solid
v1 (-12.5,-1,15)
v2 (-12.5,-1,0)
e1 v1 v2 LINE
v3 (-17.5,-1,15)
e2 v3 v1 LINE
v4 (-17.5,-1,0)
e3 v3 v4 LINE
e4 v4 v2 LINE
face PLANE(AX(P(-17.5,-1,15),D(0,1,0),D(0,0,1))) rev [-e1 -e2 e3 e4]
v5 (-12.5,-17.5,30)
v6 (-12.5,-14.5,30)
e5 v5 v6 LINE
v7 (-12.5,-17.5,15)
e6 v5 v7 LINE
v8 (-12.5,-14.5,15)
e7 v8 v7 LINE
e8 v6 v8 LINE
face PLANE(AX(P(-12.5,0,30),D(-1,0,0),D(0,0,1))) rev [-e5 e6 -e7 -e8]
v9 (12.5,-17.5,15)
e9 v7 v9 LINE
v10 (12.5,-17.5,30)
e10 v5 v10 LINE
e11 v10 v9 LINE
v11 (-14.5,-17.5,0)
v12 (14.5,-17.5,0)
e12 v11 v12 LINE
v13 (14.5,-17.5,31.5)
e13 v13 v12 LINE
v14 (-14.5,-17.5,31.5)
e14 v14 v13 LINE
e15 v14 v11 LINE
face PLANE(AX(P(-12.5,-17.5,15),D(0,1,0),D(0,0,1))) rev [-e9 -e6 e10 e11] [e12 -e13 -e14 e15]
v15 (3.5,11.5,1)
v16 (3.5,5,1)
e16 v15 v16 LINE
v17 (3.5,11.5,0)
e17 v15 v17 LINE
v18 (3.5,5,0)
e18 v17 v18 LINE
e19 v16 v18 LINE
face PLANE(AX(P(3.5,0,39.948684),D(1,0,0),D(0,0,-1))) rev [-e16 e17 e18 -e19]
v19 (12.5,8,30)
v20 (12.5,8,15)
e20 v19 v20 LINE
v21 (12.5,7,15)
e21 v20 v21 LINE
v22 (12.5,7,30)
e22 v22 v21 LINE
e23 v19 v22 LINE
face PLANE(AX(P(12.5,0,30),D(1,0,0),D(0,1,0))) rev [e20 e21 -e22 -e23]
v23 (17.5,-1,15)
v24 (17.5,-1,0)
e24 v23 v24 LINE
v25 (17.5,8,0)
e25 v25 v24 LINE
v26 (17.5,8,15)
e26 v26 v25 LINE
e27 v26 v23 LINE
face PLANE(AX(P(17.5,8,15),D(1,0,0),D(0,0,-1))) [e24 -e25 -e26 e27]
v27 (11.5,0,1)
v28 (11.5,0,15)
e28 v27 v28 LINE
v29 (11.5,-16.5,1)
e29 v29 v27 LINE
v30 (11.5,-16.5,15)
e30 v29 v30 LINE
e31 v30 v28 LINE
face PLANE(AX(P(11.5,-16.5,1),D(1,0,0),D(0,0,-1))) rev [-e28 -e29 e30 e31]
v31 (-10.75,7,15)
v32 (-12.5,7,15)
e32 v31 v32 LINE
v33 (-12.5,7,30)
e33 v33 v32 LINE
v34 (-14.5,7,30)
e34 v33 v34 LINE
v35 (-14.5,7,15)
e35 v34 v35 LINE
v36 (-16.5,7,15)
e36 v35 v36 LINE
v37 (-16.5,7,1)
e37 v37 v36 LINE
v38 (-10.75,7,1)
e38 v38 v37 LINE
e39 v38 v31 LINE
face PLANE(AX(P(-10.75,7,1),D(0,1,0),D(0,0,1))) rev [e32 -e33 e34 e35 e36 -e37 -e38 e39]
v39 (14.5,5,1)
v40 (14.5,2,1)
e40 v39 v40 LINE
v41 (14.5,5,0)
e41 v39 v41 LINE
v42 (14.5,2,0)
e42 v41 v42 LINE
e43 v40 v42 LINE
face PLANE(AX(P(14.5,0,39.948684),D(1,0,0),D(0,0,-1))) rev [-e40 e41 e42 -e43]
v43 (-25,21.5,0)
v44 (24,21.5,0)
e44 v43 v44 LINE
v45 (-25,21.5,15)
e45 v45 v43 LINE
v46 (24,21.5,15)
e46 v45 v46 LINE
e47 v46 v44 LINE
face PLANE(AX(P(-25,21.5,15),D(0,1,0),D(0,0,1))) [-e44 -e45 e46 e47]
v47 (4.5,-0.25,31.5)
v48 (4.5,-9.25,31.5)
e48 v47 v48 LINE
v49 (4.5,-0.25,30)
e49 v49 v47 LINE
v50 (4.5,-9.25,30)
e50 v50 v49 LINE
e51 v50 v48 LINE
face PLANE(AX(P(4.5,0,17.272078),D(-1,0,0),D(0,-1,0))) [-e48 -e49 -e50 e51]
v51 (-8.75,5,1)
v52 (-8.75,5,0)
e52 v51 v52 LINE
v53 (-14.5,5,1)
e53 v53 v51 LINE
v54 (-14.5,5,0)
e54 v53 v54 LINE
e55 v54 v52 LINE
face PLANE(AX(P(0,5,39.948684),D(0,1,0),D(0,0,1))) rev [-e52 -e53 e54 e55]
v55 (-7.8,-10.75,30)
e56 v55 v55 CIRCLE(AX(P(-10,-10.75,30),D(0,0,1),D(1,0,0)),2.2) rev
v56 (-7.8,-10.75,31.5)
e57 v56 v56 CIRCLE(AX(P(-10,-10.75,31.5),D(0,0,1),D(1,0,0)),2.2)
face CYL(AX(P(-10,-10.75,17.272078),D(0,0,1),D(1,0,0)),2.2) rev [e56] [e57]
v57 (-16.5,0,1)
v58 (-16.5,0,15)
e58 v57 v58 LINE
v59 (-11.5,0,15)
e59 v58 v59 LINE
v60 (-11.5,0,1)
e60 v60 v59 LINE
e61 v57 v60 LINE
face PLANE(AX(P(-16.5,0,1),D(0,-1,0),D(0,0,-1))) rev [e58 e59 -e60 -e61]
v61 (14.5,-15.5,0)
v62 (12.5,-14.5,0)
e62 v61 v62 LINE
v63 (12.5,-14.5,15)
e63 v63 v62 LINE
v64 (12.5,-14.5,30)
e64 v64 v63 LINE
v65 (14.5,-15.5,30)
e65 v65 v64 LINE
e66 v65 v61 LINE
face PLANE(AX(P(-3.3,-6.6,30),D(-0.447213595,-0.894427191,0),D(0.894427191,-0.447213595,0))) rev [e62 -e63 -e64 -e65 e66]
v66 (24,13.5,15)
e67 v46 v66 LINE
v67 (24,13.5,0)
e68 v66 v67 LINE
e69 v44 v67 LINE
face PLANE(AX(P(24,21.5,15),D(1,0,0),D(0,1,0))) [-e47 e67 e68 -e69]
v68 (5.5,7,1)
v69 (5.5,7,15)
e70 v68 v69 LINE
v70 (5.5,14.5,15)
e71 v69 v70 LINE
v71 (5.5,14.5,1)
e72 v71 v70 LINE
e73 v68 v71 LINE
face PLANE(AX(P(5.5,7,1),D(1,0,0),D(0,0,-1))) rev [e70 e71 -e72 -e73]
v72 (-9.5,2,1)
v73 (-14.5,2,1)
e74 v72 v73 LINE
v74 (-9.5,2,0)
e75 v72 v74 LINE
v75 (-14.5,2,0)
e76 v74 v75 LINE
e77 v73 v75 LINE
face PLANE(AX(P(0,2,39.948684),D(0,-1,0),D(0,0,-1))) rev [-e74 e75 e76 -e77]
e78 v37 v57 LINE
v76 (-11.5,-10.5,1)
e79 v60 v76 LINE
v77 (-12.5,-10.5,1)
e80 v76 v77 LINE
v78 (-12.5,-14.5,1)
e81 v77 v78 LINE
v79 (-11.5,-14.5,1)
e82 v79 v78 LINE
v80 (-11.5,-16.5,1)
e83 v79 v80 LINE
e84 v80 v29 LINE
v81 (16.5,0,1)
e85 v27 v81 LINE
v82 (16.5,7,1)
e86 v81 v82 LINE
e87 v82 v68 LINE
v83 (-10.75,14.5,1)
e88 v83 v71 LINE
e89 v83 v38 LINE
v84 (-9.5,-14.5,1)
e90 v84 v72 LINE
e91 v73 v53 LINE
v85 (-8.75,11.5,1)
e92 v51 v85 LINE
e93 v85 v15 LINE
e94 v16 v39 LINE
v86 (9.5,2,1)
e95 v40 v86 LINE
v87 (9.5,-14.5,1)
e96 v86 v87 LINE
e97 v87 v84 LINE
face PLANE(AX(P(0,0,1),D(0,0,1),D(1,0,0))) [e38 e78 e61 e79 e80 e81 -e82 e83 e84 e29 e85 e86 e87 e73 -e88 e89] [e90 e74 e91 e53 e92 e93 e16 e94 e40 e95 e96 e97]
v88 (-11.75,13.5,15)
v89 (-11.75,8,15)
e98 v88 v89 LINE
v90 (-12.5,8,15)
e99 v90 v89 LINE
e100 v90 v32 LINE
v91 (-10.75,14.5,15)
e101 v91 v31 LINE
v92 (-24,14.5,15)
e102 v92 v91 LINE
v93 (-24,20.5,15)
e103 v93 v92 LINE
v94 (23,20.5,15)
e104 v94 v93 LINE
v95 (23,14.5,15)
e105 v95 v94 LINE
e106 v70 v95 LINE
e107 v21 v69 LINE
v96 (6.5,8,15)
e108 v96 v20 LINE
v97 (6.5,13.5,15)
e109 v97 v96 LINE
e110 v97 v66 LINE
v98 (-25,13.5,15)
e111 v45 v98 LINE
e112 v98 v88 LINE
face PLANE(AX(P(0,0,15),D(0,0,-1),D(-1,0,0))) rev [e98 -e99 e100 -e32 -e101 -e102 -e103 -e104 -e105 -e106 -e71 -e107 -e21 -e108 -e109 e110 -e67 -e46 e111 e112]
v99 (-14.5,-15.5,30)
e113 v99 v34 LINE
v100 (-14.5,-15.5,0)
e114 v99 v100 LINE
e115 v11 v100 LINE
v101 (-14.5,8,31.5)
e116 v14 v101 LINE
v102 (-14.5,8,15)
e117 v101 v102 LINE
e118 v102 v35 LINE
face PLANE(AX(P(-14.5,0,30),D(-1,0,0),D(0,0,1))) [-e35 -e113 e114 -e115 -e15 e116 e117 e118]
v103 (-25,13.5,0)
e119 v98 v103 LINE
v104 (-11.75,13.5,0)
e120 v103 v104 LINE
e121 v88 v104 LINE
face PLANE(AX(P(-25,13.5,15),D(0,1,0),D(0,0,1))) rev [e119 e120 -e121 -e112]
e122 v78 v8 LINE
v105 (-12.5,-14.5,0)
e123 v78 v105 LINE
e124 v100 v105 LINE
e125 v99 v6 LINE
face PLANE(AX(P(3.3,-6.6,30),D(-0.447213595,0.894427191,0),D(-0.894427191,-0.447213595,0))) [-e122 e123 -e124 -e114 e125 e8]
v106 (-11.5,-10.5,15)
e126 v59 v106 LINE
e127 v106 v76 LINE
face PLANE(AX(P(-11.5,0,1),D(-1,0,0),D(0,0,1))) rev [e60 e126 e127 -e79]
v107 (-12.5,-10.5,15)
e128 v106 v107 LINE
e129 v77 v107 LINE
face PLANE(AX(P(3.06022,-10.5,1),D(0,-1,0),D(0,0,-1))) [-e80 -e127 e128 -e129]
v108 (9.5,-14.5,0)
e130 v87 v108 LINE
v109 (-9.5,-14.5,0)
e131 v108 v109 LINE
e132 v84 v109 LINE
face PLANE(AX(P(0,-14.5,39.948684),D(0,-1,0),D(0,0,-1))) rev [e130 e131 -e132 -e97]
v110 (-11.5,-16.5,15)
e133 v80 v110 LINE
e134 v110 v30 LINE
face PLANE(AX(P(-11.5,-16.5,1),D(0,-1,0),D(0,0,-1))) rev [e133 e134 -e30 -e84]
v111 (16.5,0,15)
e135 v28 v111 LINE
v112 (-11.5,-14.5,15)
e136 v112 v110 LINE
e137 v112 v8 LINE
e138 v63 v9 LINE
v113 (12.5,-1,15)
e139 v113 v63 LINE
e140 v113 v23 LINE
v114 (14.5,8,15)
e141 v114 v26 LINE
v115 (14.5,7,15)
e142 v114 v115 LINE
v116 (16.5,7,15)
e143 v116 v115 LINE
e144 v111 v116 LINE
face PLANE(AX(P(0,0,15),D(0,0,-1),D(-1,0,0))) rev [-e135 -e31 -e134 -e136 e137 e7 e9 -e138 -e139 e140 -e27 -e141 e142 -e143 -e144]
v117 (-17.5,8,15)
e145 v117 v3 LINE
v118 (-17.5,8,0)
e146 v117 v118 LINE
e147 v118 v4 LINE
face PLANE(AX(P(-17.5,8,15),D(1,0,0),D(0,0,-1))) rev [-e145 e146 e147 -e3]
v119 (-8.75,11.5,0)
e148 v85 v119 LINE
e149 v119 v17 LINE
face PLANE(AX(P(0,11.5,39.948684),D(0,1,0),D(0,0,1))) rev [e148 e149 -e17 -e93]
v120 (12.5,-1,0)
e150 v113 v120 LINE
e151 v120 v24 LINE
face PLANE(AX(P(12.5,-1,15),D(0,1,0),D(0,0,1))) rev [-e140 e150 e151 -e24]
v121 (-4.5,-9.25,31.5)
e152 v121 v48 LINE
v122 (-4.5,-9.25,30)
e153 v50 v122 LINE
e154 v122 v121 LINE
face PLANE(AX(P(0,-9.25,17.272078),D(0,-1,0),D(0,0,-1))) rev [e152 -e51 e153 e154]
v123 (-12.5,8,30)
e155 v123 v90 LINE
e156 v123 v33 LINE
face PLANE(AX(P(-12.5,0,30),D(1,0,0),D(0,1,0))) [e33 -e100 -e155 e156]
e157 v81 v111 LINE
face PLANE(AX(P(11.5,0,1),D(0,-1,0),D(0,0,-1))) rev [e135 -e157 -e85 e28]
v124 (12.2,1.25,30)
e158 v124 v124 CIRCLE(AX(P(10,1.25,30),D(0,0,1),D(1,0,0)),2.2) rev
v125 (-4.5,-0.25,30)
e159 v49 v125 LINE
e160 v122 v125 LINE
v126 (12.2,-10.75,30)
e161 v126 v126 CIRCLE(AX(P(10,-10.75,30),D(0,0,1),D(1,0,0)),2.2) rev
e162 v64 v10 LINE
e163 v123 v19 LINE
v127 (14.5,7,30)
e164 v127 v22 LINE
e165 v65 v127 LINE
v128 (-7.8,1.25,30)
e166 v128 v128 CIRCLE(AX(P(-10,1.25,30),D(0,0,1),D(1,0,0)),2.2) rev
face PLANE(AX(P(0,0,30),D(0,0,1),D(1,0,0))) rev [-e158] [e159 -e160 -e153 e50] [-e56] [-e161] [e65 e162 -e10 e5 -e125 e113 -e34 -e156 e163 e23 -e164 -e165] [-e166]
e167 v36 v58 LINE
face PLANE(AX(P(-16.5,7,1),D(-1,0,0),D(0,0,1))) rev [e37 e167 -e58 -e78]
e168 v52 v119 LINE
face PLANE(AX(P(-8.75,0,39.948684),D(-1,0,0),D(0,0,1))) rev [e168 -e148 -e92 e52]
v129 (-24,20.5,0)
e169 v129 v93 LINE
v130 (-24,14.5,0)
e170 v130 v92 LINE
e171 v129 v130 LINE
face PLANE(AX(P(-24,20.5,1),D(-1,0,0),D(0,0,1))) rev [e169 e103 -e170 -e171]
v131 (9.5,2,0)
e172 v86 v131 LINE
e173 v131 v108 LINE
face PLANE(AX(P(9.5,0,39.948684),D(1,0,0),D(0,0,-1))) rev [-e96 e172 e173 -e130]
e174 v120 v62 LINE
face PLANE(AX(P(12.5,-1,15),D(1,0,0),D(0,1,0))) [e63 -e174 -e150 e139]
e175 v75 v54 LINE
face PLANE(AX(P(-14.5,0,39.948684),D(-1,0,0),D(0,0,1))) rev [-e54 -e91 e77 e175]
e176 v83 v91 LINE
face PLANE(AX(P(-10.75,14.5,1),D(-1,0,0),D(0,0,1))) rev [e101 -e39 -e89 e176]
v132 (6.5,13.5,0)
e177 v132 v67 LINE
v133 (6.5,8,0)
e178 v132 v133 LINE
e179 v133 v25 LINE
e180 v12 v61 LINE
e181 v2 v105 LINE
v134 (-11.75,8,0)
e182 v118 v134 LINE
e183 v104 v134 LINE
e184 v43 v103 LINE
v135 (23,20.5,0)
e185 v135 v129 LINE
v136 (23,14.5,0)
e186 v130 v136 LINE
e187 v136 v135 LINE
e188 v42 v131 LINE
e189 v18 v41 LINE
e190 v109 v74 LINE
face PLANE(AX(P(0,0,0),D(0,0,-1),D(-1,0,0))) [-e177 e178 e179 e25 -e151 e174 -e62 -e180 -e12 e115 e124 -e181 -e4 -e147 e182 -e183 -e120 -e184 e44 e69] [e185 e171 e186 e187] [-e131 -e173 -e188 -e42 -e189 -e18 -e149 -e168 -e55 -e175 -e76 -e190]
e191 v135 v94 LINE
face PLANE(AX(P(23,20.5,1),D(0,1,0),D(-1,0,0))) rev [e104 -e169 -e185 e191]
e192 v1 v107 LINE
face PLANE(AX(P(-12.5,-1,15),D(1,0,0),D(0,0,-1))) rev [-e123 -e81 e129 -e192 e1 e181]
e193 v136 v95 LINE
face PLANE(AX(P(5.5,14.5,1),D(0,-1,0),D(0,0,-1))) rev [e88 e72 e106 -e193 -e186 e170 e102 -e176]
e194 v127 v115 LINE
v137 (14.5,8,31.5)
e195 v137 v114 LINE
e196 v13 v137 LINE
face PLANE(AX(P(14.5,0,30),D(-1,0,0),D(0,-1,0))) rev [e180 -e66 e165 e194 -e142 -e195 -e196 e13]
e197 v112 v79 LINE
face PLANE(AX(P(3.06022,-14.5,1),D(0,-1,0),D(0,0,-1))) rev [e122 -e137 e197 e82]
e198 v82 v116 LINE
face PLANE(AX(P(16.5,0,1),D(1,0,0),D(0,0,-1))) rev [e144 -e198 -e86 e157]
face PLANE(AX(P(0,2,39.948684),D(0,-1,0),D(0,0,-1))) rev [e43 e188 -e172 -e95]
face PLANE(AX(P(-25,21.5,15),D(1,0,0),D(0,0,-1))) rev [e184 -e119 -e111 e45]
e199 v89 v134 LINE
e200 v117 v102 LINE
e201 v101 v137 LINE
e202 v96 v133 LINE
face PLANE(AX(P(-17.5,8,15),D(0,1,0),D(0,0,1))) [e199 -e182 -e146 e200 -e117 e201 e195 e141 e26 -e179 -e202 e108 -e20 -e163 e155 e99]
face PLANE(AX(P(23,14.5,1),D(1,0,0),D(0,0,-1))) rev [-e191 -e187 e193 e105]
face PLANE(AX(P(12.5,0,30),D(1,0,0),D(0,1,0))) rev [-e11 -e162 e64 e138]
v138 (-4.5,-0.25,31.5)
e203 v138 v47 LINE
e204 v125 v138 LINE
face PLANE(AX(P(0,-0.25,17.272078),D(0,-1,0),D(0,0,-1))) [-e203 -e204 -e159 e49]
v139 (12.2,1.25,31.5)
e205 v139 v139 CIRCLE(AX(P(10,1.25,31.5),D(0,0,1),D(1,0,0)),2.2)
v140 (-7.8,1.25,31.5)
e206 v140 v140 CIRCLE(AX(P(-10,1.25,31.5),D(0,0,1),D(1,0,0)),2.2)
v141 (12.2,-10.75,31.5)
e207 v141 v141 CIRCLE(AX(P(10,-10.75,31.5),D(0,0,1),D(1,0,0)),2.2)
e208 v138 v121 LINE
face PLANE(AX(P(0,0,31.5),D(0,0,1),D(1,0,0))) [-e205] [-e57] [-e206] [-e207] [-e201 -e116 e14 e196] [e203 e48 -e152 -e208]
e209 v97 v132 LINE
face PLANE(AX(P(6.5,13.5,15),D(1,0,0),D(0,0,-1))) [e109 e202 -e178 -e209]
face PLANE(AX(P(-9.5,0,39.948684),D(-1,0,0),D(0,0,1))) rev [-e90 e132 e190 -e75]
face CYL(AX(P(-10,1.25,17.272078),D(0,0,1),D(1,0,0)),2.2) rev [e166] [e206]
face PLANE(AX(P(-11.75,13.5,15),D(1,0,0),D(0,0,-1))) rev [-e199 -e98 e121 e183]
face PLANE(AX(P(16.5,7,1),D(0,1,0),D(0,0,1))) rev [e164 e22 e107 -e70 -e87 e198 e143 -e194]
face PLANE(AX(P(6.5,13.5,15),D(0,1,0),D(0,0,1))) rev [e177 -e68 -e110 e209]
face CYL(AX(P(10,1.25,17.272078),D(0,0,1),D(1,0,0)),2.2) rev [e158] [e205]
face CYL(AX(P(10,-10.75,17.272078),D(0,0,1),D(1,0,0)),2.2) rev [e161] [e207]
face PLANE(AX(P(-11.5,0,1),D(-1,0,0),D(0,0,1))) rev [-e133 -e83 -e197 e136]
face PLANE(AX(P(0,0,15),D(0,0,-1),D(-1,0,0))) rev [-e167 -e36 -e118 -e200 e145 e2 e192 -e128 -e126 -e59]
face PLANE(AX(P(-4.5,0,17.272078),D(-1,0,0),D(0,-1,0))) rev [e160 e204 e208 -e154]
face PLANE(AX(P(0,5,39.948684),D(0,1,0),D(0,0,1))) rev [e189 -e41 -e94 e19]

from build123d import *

# Parameters (mm, degrees)
EXTRUDE_1_DEPTH      = 15
CUT_EXTRUDE_1_DEPTH  = 14
SKETCH_7_W           = 47
SKETCH_7_H           = 6
CUT_EXTRUDE_2_DEPTH  = 1
SKETCH_8_W           = 14
SKETCH_8_H           = 4
CUT_EXTRUDE_3_DEPTH  = 1
CUT_EXTRUDE_6_DEPTH  = 1
EXTRUDE_START        = -30
EXTRUDE_10_OUTLINE_W = 2
EXTRUDE_10_OUTLINE_H = 1
EXTRUDE_10_DEPTH     = 30
SKETCH_29_W          = 29
SKETCH_29_H          = 25.5
EXTRUDE_12_DEPTH     = 1.5
SKETCH_30_R          = 2.2
SKETCH_30_W          = 9
SKETCH_30_H          = 9
CUT_EXTRUDE_8_DEPTH  = 1.5


# Read off the part's stored shape, not the designer's step: 凸台-拉伸10
with BuildPart() as part:
    # 草图3 → 凸台-拉伸1 (new body)
    with BuildSketch(Plane.XY):
        Polygon((-25, 21.5), (24, 21.5), (24, 13.5), (6.5, 13.5), (6.5, 8), (17.5, 8), (17.5, -1), (12.5, -1), (12.5, -17.5), (-12.5, -17.5), (-12.5, -1), (-17.5, -1), (-17.5, 8), (-11.75, 8), (-11.75, 13.5), (-25, 13.5), align=None)
    extrude(amount=EXTRUDE_1_DEPTH)

    # 草图4 → 切除-拉伸1 (cut)
    with BuildSketch(Plane.XY.offset(15)):
        Polygon((23, 20.5), (-24, 20.5), (-24, 14.5), (-10.75, 14.5), (-10.75, 7), (-16.5, 7), (-16.5, 0), (-11.5, 0), (-11.5, -16.5), (11.5, -16.5), (11.5, 0), (16.5, 0), (16.5, 7), (5.5, 7), (5.5, 14.5), (23, 14.5), align=None)
    extrude(amount=-CUT_EXTRUDE_1_DEPTH, mode=Mode.SUBTRACT)

    # 草图7 → 切除-拉伸2 (cut)
    with BuildSketch(Plane.XY.offset(1)):
        with Locations((-0.5, 17.5)):
            Rectangle(SKETCH_7_W, SKETCH_7_H)
    extrude(amount=-CUT_EXTRUDE_2_DEPTH, mode=Mode.SUBTRACT)

    # 草图8 → 切除-拉伸3 (cut)
    with BuildSketch(Plane.ZY.offset(12.5)):
        with Locations((8, -12.5)):
            Rectangle(SKETCH_8_W, SKETCH_8_H)
    extrude(amount=-CUT_EXTRUDE_3_DEPTH, mode=Mode.SUBTRACT)

    # 草图9 → 切除-拉伸6 (cut)
    with BuildSketch(Plane(origin=(0, 0, 0), x_dir=(-1, 0, 0), z_dir=(0, 0, -1))):
        Polygon((-3.5, 11.5), (-3.5, 5), (-14.5, 5), (-14.5, 2), (-9.5, 2), (-9.5, -14.5), (9.5, -14.5), (9.5, 2), (14.5, 2), (14.5, 5), (8.75, 5), (8.75, 11.5), align=None)
    extrude(amount=-CUT_EXTRUDE_6_DEPTH, mode=Mode.SUBTRACT)

    # 凸台-拉伸10 outline → 凸台-拉伸10 (add)
    with BuildSketch(Plane(origin=(0, 0, 0), x_dir=(-1, 0, 0), z_dir=(0, 0, -1)).offset(EXTRUDE_START)):
        Polygon((-14.5, -17.5), (-12.5, -17.5), (-12.5, -14.5), (-14.5, -15.5), align=None)
        Polygon((12.5, -17.5), (14.5, -17.5), (14.5, -15.5), (12.5, -14.5), align=None)
        with Locations((-13.5, 7.5)):
            Rectangle(EXTRUDE_10_OUTLINE_W, EXTRUDE_10_OUTLINE_H)
        with Locations((13.5, 7.5)):
            Rectangle(EXTRUDE_10_OUTLINE_W, EXTRUDE_10_OUTLINE_H)
    extrude(amount=EXTRUDE_10_DEPTH)

    # 草图29 → 凸台-拉伸12 (add)
    with BuildSketch(Plane.XY.offset(30)):
        with Locations((0, -4.75)):
            Rectangle(SKETCH_29_W, SKETCH_29_H)
    extrude(amount=EXTRUDE_12_DEPTH)

    # 草图30 → 切除-拉伸8 (cut)
    with BuildSketch(Plane.XY.offset(31.5)):
        with Locations((-10, 1.25)):
            Circle(SKETCH_30_R)
        with Locations((-10, -10.75)):
            Circle(SKETCH_30_R)
        with Locations((10, 1.25)):
            Circle(SKETCH_30_R)
        with Locations((10, -10.75)):
            Circle(SKETCH_30_R)
        with Locations((0, -4.75)):
            Rectangle(SKETCH_30_W, SKETCH_30_H)
    extrude(amount=-CUT_EXTRUDE_8_DEPTH, mode=Mode.SUBTRACT)


solid = part.part
